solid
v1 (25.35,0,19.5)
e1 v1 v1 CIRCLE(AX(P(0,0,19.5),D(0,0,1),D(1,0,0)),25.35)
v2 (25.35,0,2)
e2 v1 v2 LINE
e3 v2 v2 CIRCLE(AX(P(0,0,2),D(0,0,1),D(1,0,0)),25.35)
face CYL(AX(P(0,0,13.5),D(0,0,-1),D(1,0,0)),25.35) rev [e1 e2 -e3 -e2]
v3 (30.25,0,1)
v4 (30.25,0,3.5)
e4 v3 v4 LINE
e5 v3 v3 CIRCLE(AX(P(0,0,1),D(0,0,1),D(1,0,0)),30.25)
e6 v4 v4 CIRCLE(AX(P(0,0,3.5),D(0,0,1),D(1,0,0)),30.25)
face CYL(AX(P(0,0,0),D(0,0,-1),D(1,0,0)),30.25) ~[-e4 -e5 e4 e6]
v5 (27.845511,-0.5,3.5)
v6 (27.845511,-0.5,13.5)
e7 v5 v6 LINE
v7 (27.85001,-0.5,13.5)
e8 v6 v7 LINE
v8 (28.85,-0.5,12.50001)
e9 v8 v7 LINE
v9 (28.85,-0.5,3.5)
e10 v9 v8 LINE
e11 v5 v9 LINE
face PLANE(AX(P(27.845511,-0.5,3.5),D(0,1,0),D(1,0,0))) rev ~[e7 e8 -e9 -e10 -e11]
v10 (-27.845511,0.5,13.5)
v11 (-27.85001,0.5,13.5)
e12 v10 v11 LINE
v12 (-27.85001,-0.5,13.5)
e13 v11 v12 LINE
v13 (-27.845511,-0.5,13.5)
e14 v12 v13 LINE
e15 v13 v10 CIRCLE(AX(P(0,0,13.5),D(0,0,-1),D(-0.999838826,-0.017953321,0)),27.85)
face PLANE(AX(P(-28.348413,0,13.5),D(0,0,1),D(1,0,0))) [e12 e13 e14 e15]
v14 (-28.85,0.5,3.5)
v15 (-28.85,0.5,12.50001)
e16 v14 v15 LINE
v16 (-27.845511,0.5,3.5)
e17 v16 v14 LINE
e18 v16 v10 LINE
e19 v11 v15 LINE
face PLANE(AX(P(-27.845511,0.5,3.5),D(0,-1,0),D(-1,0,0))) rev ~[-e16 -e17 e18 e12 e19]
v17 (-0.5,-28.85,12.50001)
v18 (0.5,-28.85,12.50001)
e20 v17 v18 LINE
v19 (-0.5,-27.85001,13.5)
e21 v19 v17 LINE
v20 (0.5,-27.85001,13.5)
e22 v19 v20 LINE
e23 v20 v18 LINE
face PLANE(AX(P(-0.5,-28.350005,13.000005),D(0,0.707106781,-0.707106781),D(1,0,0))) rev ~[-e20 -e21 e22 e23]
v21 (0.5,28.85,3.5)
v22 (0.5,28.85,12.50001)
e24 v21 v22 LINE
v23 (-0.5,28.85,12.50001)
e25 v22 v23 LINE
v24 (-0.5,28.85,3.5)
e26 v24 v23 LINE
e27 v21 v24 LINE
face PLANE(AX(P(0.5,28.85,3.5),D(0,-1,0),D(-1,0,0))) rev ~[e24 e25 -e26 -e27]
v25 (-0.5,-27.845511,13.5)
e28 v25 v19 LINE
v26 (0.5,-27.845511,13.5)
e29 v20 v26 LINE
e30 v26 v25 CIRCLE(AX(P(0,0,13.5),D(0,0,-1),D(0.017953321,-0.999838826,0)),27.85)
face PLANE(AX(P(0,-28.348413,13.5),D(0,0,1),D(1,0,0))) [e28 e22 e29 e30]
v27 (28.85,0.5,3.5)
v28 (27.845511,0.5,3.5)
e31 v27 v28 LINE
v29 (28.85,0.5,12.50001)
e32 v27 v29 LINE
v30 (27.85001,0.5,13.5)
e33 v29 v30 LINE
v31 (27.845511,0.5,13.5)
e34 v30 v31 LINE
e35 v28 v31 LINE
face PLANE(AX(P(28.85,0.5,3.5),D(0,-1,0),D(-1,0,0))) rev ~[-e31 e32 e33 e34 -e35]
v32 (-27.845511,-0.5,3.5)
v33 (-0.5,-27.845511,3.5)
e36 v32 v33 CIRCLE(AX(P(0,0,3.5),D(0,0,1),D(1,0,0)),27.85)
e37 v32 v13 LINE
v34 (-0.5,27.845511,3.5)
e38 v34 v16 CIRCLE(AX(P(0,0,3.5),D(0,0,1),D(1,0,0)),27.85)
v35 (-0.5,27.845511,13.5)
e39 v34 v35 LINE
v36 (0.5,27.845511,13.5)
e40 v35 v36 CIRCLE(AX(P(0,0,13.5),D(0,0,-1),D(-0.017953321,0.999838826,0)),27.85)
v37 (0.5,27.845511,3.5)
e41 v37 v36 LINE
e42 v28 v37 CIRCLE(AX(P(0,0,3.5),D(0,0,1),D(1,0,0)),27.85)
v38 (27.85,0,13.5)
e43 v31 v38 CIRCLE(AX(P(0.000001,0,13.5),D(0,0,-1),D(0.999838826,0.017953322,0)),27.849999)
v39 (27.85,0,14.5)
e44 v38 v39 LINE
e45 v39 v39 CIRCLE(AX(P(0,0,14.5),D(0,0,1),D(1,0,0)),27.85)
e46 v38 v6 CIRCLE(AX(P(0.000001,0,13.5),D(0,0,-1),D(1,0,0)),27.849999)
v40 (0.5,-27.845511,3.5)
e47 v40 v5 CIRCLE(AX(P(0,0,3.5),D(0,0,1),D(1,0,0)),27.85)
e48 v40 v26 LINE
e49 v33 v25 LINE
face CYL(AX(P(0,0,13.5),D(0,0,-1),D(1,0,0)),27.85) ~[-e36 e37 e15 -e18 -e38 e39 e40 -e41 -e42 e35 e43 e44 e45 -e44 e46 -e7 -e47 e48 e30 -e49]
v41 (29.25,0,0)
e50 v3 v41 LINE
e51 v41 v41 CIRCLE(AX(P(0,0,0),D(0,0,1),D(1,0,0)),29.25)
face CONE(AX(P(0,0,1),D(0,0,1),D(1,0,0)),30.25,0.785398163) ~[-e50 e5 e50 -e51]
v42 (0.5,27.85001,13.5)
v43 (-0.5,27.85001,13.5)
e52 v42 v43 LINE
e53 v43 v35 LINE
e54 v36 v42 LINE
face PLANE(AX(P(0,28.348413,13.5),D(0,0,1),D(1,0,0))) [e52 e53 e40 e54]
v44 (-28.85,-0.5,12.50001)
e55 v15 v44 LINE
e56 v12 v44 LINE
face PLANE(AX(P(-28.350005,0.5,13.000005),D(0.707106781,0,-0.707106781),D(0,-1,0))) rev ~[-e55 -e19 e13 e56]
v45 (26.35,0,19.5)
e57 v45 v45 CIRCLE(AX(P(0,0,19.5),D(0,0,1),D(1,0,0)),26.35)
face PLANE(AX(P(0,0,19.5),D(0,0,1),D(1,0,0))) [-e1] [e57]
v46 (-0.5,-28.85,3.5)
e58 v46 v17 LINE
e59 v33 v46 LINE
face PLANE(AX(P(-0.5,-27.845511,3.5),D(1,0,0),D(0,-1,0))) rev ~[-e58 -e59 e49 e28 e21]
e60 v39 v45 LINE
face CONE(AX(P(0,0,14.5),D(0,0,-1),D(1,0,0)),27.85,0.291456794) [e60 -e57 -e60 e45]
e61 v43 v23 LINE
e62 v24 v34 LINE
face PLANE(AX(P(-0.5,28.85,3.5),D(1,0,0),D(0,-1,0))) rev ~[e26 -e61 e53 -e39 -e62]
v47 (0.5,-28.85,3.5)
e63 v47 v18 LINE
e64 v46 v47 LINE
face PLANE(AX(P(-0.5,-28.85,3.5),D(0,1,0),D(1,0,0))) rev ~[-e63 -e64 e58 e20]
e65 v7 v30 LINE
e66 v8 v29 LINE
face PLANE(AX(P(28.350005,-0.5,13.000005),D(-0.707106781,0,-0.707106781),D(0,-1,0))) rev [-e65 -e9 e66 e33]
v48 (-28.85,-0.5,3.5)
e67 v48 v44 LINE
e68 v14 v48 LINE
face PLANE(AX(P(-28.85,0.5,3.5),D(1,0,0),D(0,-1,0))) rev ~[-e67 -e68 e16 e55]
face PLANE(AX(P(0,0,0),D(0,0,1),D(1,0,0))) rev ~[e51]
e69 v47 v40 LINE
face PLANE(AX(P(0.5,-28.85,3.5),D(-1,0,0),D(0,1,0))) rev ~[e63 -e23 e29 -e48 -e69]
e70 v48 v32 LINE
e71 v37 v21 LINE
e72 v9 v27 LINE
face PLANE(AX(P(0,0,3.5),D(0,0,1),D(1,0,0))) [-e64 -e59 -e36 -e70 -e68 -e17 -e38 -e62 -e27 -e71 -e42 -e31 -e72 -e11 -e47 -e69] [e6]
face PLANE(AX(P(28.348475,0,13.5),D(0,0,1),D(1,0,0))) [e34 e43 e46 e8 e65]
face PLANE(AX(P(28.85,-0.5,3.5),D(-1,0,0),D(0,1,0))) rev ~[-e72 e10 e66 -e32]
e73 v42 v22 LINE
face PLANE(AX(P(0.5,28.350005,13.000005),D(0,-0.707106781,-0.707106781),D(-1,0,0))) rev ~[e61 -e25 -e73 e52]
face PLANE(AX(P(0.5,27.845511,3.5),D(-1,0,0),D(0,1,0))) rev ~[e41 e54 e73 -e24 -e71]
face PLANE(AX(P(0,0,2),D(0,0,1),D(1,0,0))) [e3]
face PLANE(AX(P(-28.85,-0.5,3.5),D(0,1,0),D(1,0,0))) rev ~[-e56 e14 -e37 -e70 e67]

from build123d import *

# Parameters (mm, degrees)
F0_R      = 30.25
F1_DEPTH  = 3.5
F3_R      = 27.85
F3_R_2    = 25.35
F4_DEPTH  = 10
F5_DEPTH  = 6
F6_SIZE2  = 1.5
F6_SIZE   = 5
F8_DEPTH  = 10
F9_SIZE   = 0.99999
F10_DEPTH = 1.5
F11_SIZE  = 1


# Not quite as in the source:
# - a fillet or chamfer is up to 0.001 mm smaller than in the source, because OpenCascade refuses the exact size


with BuildPart() as f1:
    # F0 (on Top) → F1 (new body)
    with BuildSketch(Plane.XY):
        Circle(F0_R)
    extrude(amount=F1_DEPTH)

    # F3 (on face) → F4 (join)
    with BuildSketch(Plane.XY.offset(3.5)):
        Circle(F3_R)
        Circle(F3_R_2, mode=Mode.SUBTRACT)
    extrude(amount=F4_DEPTH)

    # F5 (add): a face of the model
    f5_faces = [f1.faces().sort_by_distance(p)[0] for p in [
        (-27.0622830458, 0, 13.5),
    ]]
    extrude(f5_faces, amount=F5_DEPTH)

    # F6
    f6_edges = [f1.edges().sort_by_distance(p)[0] for p in [
        (-27.85, 0, 19.5),
    ]]
    f6_side = f1.faces().sort_by_distance((-27.85, 0, 11.5))[0]
    chamfer(f6_edges, length=F6_SIZE, length2=F6_SIZE2, reference=f6_side)

    # F7 (on face) → F8 (join)
    with BuildSketch(Plane.XY.offset(3.5)):
        with BuildLine():
            ThreePointArc((27.85, 0), (27.8488778044, -0.250010074), (27.8455113079, -0.5))
            Line((27.8455113079, -0.5), (28.85, -0.5))
            Line((28.85, -0.5), (28.85, 0.5))
            Line((28.85, 0.5), (27.8455113079, 0.5))
            ThreePointArc((27.8455113079, 0.5), (27.8488778044, 0.250010074), (27.85, 0))
        make_face()
        with BuildLine():
            Line((-28.85, -0.5), (-27.8455113079, -0.5))
            ThreePointArc((-27.8455113079, -0.5), (-27.85, 0), (-27.8455113079, 0.5))
            Line((-27.8455113079, 0.5), (-28.85, 0.5))
            Line((-28.85, 0.5), (-28.85, -0.5))
        make_face()
        with BuildLine():
            Line((-0.5, -28.85), (0.5, -28.85))
            Line((0.5, -28.85), (0.5, -27.8455113079))
            ThreePointArc((0.5, -27.8455113079), (0, -27.85), (-0.5, -27.8455113079))
            Line((-0.5, -27.8455113079), (-0.5, -28.85))
        make_face()
        with BuildLine():
            ThreePointArc((-0.5, 27.8455113079), (0, 27.85), (0.5, 27.8455113079))
            Line((0.5, 27.8455113079), (0.5, 28.85))
            Line((0.5, 28.85), (-0.5, 28.85))
            Line((-0.5, 28.85), (-0.5, 27.8455113079))
        make_face()
    extrude(amount=F8_DEPTH)

    # F9 (size 1 in the source; OpenCascade refuses exactly that, so slightly less here)
    f9_edges = [f1.edges().sort_by_distance(p)[0] for p in [
        (28.85, 0, 13.5),
        (0, 28.85, 13.5),
        (-28.85, 0, 13.5),
        (0, -28.85, 13.5),
    ]]
    chamfer(f9_edges, length=F9_SIZE)

    # F10 (cut): a face of the model
    f10_faces = [f1.faces().sort_by_distance(p)[0] for p in [
        (0, 0, 3.5),
    ]]
    extrude(f10_faces, amount=-F10_DEPTH, mode=Mode.SUBTRACT)

    # F11
    f11_edges = [f1.edges().sort_by_distance(p)[0] for p in [
        (-30.25, 0, 0),
    ]]
    chamfer(f11_edges, length=F11_SIZE)


solid = f1.part
